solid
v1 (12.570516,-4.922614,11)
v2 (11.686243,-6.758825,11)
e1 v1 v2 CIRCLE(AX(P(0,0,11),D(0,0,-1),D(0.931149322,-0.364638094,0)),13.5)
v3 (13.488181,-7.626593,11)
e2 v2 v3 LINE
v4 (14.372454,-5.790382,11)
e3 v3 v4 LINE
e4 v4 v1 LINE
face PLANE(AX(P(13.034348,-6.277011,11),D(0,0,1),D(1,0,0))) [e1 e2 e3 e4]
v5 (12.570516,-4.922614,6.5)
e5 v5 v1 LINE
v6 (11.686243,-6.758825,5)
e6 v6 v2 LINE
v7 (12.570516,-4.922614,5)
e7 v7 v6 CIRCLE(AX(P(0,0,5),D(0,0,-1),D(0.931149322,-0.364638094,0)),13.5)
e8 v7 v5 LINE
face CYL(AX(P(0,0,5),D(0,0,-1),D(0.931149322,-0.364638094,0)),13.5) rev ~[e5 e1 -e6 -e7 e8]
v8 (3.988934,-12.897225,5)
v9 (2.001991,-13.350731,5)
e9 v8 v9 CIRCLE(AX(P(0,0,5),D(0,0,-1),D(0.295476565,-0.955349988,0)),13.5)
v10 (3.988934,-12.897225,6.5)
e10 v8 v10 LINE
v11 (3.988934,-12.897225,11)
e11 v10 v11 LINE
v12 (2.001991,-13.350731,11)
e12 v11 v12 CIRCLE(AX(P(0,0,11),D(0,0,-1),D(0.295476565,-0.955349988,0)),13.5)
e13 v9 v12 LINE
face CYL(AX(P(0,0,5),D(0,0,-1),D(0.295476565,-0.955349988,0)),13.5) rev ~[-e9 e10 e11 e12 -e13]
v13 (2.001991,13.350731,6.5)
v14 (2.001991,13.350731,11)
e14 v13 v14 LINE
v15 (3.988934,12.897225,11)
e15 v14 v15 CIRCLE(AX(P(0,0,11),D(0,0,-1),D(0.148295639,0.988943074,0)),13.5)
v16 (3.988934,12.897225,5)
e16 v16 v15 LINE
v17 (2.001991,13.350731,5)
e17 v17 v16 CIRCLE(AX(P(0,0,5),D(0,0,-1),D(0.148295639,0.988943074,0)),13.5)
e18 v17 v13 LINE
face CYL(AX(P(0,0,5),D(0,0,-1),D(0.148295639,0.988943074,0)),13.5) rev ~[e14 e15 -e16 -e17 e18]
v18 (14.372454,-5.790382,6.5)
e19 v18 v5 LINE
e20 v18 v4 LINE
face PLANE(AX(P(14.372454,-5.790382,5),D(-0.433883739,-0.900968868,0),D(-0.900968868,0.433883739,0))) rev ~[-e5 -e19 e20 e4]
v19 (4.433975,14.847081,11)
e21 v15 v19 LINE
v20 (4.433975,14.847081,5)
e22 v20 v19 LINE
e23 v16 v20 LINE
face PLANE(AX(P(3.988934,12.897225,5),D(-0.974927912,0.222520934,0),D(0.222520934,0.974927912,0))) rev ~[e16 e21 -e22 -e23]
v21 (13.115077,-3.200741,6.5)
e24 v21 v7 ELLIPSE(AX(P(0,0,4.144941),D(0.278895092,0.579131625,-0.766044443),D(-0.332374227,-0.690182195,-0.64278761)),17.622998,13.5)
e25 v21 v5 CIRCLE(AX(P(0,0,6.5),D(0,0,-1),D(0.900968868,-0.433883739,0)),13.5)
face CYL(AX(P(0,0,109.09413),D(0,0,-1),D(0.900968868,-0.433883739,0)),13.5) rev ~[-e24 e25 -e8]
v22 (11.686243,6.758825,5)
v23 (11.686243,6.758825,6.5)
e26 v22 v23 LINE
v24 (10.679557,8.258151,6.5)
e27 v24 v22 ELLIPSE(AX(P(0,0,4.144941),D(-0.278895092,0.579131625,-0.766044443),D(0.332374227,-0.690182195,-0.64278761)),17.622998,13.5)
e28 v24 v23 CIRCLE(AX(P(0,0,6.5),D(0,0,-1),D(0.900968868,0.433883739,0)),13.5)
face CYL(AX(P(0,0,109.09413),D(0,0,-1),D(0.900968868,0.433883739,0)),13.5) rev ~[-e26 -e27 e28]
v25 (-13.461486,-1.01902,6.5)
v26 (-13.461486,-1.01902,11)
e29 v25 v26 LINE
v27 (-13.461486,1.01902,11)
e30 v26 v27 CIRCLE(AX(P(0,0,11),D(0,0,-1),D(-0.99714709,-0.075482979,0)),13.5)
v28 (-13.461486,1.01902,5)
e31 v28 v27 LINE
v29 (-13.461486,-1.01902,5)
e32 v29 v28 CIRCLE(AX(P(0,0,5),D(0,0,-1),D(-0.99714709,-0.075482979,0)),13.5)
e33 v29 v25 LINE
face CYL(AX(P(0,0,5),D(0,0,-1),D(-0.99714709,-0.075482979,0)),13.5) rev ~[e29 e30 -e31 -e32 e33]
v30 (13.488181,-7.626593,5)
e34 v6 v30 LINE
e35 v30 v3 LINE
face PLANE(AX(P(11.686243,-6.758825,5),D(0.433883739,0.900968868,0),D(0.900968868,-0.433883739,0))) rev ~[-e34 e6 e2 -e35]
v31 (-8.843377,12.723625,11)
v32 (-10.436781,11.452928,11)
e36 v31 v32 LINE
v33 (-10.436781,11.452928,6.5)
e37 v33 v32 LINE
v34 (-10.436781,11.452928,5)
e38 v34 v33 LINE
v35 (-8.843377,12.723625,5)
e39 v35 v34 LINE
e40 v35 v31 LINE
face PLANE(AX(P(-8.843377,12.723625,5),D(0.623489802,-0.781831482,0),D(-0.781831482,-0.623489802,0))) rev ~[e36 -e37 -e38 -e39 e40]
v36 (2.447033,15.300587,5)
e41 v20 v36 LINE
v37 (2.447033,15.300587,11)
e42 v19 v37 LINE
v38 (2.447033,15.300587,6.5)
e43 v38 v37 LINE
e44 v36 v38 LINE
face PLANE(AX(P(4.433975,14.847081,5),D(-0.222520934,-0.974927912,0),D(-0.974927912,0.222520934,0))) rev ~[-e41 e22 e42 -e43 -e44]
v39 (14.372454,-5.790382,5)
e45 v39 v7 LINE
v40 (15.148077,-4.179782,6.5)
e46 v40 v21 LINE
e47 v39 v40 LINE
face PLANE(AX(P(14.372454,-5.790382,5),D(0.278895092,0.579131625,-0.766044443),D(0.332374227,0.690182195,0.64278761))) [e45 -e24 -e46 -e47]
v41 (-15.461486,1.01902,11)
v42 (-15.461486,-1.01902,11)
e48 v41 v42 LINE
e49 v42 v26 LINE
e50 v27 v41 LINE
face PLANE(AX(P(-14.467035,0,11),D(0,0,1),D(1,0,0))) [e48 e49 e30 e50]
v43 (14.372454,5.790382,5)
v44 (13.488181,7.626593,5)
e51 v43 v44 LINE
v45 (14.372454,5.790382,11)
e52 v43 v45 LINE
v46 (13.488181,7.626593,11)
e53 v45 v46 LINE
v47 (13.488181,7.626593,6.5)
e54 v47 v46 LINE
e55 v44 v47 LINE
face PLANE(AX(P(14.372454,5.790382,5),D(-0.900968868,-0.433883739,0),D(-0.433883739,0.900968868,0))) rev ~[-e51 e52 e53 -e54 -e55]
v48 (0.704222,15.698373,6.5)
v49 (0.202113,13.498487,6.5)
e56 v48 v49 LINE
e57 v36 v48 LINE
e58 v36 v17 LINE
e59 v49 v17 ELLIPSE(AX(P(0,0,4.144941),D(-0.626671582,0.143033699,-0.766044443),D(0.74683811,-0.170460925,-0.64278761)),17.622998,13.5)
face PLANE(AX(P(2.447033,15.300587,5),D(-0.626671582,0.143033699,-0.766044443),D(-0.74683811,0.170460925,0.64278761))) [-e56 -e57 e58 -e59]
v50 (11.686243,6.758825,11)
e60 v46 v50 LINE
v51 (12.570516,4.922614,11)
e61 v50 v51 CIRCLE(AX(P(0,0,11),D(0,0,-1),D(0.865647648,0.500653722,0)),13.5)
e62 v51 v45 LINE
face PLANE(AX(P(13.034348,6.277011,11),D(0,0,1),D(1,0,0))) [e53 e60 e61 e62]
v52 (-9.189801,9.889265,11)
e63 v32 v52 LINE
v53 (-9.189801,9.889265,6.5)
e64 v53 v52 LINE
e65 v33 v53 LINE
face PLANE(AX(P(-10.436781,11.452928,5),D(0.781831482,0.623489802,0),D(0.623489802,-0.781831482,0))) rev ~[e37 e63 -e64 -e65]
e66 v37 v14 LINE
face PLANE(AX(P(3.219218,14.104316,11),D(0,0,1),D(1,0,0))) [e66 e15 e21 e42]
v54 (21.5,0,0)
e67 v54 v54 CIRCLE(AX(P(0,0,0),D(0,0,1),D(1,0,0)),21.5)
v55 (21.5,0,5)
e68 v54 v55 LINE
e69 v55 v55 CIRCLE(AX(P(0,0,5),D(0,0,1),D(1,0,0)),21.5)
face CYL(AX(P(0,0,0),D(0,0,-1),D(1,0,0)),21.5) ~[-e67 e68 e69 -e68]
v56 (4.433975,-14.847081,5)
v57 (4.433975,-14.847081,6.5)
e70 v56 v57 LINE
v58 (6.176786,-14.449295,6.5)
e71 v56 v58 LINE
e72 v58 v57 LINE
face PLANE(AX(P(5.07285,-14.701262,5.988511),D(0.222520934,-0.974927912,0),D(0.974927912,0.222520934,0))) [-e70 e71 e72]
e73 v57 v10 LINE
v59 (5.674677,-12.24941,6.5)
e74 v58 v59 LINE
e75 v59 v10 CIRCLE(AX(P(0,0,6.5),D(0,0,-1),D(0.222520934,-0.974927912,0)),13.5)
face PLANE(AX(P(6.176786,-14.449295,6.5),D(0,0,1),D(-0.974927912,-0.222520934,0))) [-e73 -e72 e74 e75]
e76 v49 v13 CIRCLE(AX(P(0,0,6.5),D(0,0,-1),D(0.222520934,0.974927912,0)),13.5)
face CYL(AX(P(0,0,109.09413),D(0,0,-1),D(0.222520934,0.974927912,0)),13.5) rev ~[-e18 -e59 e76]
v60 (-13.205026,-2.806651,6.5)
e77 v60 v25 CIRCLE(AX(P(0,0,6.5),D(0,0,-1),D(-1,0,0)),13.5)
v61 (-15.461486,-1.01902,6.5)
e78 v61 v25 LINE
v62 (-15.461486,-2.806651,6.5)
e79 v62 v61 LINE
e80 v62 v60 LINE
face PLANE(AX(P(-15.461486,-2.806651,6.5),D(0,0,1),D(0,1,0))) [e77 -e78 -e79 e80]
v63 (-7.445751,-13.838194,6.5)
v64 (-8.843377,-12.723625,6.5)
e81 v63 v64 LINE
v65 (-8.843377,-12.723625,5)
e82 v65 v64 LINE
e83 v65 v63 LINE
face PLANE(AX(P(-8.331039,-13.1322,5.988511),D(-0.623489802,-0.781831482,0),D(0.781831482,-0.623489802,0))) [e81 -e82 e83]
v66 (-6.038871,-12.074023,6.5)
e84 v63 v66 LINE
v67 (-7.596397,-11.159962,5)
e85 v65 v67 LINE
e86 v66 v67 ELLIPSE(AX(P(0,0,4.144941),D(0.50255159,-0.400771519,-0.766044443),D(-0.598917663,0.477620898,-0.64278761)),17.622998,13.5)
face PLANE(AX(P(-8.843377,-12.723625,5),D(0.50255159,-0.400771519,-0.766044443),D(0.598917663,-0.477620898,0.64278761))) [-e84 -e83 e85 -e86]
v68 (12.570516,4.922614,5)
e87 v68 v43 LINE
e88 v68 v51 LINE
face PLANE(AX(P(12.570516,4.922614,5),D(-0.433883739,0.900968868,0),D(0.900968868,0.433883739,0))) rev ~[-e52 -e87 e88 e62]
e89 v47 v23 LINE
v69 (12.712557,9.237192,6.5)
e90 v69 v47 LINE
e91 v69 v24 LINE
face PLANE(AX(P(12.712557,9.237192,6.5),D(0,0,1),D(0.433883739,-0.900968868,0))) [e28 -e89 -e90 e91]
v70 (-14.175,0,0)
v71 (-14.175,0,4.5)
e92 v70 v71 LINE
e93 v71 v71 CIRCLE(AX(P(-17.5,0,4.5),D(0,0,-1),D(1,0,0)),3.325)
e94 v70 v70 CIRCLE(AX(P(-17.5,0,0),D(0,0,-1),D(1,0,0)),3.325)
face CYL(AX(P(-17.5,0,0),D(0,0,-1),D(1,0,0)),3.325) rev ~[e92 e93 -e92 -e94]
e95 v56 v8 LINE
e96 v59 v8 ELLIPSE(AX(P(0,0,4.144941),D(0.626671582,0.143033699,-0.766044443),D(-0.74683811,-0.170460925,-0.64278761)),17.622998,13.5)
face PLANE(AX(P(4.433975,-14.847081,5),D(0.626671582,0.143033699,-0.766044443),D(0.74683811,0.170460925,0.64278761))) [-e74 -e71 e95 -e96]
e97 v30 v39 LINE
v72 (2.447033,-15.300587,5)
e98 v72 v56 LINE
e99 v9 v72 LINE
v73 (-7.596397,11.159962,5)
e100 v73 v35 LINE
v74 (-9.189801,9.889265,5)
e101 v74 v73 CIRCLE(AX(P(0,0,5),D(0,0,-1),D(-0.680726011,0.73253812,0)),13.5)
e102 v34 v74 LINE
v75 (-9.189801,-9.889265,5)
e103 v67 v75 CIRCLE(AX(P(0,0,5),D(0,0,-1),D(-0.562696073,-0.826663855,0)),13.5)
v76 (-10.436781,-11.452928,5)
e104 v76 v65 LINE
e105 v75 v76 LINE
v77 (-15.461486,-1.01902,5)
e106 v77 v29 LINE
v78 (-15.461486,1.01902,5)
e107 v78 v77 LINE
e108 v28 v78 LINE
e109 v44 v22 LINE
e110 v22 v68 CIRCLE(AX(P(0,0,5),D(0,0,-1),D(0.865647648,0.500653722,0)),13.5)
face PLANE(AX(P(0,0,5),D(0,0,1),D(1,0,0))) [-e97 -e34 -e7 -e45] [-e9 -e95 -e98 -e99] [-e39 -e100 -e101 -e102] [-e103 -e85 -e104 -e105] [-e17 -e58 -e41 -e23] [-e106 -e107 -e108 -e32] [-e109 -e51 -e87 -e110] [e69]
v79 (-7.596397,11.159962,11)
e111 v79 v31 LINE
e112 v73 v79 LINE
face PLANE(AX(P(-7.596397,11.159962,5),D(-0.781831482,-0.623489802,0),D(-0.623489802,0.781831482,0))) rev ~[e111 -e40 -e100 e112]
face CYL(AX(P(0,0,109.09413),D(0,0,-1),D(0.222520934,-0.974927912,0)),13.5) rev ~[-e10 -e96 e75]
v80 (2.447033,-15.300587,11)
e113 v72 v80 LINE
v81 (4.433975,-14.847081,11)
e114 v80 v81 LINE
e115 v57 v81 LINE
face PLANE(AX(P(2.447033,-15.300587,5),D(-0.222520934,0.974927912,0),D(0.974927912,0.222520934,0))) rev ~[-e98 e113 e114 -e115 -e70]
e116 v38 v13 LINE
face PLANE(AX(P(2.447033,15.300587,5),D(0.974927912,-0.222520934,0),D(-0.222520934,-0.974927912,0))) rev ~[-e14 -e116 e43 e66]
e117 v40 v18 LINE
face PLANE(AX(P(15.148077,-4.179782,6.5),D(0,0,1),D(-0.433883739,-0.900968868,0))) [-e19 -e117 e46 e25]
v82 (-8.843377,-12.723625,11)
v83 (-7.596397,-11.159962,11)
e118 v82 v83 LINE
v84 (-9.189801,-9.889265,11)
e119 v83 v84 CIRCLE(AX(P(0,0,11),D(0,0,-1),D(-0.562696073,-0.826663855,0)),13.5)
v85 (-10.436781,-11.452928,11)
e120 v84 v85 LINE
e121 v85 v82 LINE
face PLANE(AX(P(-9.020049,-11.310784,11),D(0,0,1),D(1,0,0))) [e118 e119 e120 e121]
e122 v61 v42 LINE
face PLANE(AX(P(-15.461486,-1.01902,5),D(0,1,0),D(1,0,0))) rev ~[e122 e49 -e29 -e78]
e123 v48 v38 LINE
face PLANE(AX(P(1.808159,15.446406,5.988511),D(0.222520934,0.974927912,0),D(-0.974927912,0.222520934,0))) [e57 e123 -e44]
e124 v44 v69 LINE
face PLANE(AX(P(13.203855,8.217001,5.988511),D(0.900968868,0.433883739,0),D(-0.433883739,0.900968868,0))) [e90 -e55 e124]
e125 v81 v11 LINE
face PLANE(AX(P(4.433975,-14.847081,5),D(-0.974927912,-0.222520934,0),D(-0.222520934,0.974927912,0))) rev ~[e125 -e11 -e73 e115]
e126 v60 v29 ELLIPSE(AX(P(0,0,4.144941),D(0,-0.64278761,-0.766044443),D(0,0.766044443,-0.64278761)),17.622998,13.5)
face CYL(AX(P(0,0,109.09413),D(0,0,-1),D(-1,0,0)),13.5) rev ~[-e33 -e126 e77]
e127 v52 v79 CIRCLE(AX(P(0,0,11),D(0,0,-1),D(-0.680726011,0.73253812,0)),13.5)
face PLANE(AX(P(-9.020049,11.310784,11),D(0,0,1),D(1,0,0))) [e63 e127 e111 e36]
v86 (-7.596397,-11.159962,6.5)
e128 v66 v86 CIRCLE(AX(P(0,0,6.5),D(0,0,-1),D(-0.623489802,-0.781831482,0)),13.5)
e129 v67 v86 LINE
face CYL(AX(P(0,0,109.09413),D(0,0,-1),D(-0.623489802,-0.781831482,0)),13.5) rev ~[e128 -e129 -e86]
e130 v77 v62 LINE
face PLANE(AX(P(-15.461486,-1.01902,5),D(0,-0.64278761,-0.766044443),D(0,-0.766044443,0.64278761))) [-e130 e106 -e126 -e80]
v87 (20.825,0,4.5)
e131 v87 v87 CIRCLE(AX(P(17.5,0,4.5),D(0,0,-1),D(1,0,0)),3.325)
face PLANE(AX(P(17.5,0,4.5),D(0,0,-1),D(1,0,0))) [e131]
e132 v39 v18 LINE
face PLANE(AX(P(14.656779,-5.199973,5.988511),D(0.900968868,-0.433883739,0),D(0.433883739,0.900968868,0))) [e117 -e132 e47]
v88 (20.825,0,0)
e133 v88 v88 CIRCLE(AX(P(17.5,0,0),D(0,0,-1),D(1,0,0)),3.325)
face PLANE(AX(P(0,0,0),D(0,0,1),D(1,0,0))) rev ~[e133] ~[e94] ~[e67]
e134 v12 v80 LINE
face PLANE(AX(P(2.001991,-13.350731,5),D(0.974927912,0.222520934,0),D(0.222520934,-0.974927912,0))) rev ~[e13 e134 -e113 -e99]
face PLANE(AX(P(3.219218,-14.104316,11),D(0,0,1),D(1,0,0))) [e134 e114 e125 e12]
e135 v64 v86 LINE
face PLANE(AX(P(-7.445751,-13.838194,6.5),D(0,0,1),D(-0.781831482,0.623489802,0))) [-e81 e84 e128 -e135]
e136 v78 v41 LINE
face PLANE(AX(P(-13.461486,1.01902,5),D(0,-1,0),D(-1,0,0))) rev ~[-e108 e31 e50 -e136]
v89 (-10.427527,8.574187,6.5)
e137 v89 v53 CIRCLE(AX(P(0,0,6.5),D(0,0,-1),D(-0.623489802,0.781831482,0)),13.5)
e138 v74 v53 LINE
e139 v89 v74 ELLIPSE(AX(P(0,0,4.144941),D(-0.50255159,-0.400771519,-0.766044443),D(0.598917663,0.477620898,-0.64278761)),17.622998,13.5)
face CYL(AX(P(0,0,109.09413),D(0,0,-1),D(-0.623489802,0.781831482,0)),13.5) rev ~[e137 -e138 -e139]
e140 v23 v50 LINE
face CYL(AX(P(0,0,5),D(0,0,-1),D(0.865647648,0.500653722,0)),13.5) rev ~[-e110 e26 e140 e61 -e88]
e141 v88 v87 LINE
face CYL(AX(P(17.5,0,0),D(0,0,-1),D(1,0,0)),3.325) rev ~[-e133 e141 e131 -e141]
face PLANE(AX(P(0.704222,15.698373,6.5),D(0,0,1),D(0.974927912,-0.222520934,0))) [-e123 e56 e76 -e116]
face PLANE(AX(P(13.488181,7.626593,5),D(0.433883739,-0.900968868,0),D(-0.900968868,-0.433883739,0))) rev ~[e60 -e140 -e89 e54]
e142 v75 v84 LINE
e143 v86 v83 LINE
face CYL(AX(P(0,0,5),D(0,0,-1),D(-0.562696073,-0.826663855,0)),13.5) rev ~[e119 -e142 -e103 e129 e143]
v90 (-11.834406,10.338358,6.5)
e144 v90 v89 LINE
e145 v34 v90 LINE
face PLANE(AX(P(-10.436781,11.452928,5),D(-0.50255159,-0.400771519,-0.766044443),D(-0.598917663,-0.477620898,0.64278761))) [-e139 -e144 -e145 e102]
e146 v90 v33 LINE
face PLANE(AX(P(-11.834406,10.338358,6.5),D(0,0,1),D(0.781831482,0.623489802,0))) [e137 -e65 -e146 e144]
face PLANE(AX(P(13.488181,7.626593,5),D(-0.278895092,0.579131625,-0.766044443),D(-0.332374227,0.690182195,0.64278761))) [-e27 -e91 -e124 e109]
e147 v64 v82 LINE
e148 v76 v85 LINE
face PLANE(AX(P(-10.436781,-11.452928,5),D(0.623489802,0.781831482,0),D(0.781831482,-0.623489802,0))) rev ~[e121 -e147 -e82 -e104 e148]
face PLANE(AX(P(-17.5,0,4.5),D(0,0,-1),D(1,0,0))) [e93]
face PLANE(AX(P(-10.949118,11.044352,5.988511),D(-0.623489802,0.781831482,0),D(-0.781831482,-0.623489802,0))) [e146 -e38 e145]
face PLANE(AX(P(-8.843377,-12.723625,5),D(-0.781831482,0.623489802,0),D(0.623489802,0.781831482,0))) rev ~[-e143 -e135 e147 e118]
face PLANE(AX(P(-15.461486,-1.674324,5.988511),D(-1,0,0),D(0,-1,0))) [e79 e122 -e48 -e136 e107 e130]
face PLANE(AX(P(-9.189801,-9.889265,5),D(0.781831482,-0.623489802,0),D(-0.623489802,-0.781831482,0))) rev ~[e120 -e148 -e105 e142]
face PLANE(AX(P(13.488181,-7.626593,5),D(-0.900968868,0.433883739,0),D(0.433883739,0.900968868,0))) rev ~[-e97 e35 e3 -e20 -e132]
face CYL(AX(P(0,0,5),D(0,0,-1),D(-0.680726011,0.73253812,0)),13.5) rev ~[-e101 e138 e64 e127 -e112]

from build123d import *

# Parameters (mm, degrees)
F0_R            = 21.5
F0_R_2          = 13.5
F1_DEPTH        = 5
F3_DEPTH        = 6
F4_R            = 3.325
F5_DEPTH        = 4.5
F7_END_RADIUS   = 13.5
F7_REACH        = 39.2960714607
F7_COPIES_COUNT = 7


# Not quite as in the source:
# - a pattern or mirror of a feature is missing from the dataset's text; its kind, count and spacing are read off the source's solid


with BuildPart() as f1:
    # F0 (on Top) → F1 (new body)
    with BuildSketch(Plane.XY):
        Circle(F0_R)
        Circle(F0_R_2, mode=Mode.SUBTRACT)
        Circle(F0_R_2)
    extrude(amount=F1_DEPTH)

    # F2 (on face) → F3 (join)
    with BuildSketch(Plane.XY.offset(5)):
        with BuildLine():
            ThreePointArc((-13.4614857204, -1.0190202158), (-13.5, 0), (-13.4614857204, 1.0190202158))
            Line((-13.4614857204, 1.0190202158), (-15.4614857204, 1.0190202158))
            Line((-15.4614857204, 1.0190202158), (-15.4614857204, -1.0190202158))
            Line((-15.4614857204, -1.0190202158), (-13.4614857204, -1.0190202158))
        make_face()
        with BuildLine():
            ThreePointArc((-7.5963969786, -11.1599620494), (-8.4171123251, -10.5547250133), (-9.1898011505, -9.8892646246))
            Line((-9.1898011505, -9.8892646246), (-10.4367807542, -11.4529275895))
            Line((-10.4367807542, -11.4529275895), (-8.8433765823, -12.7236250143))
            Line((-8.8433765823, -12.7236250143), (-7.5963969786, -11.1599620494))
        make_face()
        with BuildLine():
            ThreePointArc((3.9889336264, -12.8972248381), (3.0040326084, -13.1615268145), (2.0019911235, -13.3507314984))
            Line((2.0019911235, -13.3507314984), (2.4470329914, -15.3005873227))
            Line((2.4470329914, -15.3005873227), (4.4339754943, -14.8470806625))
            Line((4.4339754943, -14.8470806625), (3.9889336264, -12.8972248381))
        make_face()
        with BuildLine():
            ThreePointArc((12.5705158512, -4.9226142683), (12.1630797167, -5.8574304781), (11.6862432483, -6.7588252486))
            Line((11.6862432483, -6.7588252486), (13.4881809841, -7.6265927268))
            Line((13.4881809841, -7.6265927268), (14.372453587, -5.7903817465))
            Line((14.372453587, -5.7903817465), (12.5705158512, -4.9226142683))
        make_face()
        with BuildLine():
            ThreePointArc((11.6862432483, 6.7588252486), (12.1630797167, 5.8574304781), (12.5705158512, 4.9226142683))
            Line((12.5705158512, 4.9226142683), (14.372453587, 5.7903817465))
            Line((14.372453587, 5.7903817465), (13.4881809841, 7.6265927268))
            Line((13.4881809841, 7.6265927268), (11.6862432483, 6.7588252486))
        make_face()
        with BuildLine():
            ThreePointArc((2.0019911235, 13.3507314984), (3.0040326084, 13.1615268145), (3.9889336264, 12.8972248381))
            Line((3.9889336264, 12.8972248381), (4.4339754943, 14.8470806625))
            Line((4.4339754943, 14.8470806625), (2.4470329914, 15.3005873227))
            Line((2.4470329914, 15.3005873227), (2.0019911235, 13.3507314984))
        make_face()
        with BuildLine():
            ThreePointArc((-9.1898011505, 9.8892646246), (-8.4171123251, 10.5547250133), (-7.5963969786, 11.1599620494))
            Line((-7.5963969786, 11.1599620494), (-8.8433765823, 12.7236250143))
            Line((-8.8433765823, 12.7236250143), (-10.4367807542, 11.4529275895))
            Line((-10.4367807542, 11.4529275895), (-9.1898011505, 9.8892646246))
        make_face()
    extrude(amount=F3_DEPTH)

    # F4 (on face) → F5 (cut)
    with BuildSketch(Plane(origin=(0, 0, 0), x_dir=(1, 0, 0), z_dir=(0, 0, -1))):
        with Locations((-17.5, 0)):
            Circle(F4_R)
        with Locations((17.5, 0)):
            Circle(F4_R)
    extrude(amount=-F5_DEPTH, mode=Mode.SUBTRACT)

    f7_end = (Plane(origin=(0, 0, 8), x_dir=(-1, 0, 0), z_dir=(0, 0, -1)) * Cylinder(F7_END_RADIUS, 202.1882593652, mode=Mode.PRIVATE)).faces().sort_by_distance((-13.5, 0, 8))[0]
    # F6 (on face) → F7 (join, up to the whole of a round face its end follows)
    with BuildSketch(Plane(origin=(-15.4614857204, 0, 0), x_dir=(0, -1, 0), z_dir=(-1, 0, 0))):
        Polygon((1.0190202158, 6.5), (1.0190202158, 5), (2.8066506047, 6.5), align=None)
    f7_long = extrude(amount=-F7_REACH, mode=Mode.PRIVATE)
    f7 = split(f7_long, bisect_by=f7_end, keep=Keep.ALL, mode=Mode.PRIVATE).solids().sort_by_distance((-15.4614857204, -1.6148970121, 6))[0]
    add(f7)

    # F7_copies: F7 ×7 about axis
    f7_copies_axis = Axis((0, 0, 0), (0, 0, 1))
    for i in range(1, F7_COPIES_COUNT):
        add(f7.rotate(f7_copies_axis, i * 360 / F7_COPIES_COUNT))


solid = f1.part
